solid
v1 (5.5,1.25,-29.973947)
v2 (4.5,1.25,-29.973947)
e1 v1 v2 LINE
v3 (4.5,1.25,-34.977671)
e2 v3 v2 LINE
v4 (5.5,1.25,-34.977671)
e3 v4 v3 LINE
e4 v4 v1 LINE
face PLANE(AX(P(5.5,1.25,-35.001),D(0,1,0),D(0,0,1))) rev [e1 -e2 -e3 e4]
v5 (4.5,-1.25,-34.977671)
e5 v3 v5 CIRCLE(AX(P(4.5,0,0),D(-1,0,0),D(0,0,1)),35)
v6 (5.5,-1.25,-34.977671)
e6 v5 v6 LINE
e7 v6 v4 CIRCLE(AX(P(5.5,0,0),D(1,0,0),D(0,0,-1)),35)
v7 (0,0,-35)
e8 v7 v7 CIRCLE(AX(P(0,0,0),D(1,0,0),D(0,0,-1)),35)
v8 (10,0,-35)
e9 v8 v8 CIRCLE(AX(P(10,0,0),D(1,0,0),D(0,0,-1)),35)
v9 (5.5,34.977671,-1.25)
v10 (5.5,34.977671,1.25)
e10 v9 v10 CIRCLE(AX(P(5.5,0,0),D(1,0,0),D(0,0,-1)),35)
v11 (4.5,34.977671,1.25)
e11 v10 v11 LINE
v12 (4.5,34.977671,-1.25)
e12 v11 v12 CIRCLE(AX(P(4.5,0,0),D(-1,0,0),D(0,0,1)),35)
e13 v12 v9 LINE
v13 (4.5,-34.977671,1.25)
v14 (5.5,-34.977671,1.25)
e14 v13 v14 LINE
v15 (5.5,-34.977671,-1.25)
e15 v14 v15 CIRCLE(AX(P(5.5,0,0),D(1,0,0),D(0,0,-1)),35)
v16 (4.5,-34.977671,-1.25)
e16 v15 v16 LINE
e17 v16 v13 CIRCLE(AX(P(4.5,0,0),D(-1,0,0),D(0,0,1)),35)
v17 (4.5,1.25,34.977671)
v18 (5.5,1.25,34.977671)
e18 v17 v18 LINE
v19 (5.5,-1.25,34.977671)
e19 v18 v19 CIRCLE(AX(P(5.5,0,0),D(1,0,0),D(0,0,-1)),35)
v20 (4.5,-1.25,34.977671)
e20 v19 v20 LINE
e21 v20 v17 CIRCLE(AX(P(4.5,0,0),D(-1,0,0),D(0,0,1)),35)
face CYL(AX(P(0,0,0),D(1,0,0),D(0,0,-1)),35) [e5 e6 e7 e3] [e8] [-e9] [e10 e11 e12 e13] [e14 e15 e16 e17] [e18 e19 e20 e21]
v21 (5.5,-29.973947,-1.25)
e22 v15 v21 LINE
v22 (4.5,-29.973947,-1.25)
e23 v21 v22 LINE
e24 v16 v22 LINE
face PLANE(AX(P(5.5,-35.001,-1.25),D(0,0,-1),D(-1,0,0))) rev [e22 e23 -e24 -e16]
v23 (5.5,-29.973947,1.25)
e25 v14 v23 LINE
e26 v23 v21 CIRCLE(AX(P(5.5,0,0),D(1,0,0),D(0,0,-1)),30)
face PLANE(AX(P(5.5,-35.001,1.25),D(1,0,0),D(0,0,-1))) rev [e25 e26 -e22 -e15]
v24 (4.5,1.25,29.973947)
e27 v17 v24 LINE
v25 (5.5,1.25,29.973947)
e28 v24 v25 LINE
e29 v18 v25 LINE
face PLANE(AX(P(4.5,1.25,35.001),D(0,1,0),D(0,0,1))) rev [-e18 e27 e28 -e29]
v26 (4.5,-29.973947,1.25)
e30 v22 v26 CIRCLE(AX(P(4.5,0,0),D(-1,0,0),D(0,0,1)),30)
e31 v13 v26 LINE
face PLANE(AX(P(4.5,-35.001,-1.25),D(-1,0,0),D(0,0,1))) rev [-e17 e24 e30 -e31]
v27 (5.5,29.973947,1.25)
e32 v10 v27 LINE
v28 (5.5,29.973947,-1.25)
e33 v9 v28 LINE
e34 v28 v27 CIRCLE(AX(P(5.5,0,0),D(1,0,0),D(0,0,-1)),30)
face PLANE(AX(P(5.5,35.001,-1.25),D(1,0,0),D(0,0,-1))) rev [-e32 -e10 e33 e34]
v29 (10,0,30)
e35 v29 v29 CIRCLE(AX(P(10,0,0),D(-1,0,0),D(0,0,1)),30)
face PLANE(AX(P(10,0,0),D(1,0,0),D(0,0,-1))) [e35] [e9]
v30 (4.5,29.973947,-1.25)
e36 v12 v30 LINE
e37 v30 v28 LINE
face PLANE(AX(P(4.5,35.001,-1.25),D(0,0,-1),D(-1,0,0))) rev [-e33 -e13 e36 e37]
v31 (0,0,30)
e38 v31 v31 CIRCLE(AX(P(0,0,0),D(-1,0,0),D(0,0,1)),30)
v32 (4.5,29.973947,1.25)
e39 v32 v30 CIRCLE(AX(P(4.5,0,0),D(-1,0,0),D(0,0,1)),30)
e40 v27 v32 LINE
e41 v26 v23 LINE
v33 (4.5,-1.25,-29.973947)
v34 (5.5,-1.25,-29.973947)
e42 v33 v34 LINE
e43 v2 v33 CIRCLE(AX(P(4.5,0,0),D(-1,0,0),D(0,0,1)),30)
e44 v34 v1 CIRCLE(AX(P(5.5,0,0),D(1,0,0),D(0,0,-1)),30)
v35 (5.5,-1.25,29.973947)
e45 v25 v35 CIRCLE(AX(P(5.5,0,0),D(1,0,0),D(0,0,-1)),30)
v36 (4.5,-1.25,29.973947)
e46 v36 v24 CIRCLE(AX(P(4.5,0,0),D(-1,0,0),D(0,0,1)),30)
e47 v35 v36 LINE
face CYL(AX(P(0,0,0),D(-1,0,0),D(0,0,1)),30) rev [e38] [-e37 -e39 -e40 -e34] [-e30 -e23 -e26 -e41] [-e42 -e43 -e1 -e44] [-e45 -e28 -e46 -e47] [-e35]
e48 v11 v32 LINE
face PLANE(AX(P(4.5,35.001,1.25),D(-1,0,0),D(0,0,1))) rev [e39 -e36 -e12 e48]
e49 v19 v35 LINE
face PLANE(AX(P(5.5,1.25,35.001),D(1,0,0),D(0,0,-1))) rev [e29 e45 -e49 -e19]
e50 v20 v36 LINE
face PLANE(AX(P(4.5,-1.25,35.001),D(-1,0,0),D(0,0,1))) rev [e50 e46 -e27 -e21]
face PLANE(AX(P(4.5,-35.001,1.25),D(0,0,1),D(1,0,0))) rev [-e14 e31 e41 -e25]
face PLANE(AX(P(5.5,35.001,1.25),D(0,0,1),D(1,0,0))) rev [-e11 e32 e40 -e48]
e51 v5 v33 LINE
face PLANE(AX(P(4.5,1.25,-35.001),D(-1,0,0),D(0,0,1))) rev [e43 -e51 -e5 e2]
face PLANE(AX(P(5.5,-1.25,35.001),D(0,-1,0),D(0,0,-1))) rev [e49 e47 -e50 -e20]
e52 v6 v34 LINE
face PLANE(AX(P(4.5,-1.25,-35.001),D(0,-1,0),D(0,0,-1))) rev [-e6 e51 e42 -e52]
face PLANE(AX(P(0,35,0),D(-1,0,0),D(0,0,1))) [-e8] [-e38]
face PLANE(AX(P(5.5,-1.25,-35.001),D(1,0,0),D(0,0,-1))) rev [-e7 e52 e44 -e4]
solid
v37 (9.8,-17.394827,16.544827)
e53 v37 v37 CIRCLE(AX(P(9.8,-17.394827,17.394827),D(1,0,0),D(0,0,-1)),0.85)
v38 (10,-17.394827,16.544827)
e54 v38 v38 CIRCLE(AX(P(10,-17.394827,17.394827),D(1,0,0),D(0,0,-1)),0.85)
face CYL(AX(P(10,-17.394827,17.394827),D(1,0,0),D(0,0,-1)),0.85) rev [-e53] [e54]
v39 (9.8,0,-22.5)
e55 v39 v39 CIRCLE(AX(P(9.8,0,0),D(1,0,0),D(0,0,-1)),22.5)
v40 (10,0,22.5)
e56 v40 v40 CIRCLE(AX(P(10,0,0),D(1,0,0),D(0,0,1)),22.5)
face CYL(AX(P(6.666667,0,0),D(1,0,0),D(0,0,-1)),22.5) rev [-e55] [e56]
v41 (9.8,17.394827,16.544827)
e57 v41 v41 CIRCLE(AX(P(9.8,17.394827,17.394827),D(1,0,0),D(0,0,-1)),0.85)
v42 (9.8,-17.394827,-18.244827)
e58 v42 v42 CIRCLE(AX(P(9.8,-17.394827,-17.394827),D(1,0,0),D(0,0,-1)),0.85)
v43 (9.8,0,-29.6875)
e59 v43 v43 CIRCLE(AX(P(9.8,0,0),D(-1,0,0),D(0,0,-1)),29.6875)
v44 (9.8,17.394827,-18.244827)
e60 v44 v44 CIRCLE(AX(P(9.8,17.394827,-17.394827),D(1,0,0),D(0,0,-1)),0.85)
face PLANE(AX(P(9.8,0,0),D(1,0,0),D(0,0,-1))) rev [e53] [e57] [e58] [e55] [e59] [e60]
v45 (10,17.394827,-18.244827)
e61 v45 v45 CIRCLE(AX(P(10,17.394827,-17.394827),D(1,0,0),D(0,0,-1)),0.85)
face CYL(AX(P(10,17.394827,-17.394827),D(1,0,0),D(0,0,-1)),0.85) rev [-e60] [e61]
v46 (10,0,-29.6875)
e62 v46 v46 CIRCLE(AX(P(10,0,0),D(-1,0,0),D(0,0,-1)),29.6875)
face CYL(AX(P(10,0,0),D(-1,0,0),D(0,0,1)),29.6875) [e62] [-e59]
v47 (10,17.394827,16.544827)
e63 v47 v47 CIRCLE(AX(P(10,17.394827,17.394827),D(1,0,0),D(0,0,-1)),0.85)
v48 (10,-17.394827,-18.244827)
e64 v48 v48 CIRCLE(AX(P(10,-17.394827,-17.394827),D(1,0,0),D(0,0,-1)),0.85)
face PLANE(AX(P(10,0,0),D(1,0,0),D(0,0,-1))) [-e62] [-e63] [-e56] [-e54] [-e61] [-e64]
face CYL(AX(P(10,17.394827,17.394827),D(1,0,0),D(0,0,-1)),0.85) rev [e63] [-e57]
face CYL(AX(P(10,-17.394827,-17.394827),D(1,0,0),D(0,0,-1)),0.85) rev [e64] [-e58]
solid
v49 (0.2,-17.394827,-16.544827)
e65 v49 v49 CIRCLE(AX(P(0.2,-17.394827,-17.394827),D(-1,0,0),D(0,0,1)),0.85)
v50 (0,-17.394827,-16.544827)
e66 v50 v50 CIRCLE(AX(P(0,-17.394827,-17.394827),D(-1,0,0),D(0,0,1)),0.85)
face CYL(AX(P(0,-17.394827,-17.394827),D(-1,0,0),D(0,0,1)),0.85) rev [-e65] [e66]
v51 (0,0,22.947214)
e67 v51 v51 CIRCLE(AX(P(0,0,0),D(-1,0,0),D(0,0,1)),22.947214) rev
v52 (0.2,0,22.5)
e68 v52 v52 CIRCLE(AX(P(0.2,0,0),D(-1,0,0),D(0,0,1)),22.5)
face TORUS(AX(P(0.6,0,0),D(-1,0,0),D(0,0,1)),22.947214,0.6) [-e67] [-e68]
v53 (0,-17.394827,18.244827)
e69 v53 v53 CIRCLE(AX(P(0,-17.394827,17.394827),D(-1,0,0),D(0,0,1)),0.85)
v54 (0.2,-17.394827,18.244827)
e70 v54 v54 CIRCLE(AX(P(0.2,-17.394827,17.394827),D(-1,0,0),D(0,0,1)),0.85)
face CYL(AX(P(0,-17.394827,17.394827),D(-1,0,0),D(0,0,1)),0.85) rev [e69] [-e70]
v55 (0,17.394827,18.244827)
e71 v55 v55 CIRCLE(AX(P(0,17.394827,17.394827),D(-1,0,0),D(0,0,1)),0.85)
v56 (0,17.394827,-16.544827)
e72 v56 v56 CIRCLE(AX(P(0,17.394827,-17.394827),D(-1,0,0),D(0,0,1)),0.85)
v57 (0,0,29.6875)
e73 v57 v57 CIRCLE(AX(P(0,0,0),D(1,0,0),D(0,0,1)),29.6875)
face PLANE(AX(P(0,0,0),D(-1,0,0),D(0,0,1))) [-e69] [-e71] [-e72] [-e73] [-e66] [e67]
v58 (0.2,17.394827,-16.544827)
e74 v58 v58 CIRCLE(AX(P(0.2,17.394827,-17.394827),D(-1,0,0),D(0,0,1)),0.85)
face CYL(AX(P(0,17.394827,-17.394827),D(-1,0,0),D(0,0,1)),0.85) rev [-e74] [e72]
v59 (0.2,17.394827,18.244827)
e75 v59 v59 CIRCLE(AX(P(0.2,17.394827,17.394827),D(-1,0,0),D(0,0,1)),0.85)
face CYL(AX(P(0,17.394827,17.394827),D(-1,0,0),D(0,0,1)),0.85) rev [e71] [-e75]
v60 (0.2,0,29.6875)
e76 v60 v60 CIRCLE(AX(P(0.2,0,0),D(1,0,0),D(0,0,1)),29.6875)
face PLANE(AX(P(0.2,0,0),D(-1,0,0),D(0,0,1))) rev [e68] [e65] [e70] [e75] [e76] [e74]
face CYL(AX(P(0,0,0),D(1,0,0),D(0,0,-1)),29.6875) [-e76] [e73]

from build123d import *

# Parameters (mm, degrees)
SKETCH_1_W                       = 10
SKETCH_1_H                       = 35
HOLE_WIZARD_M52_1_D              = 60
SKETCH_4_R                       = 29.6875
EXTRUDE_1_DEPTH                  = 0.2
SKETCH_6_R                       = 29.6875
EXTRUDE_2_DEPTH                  = 0.2
SKETCH_7_R                       = 22.5
CUT_EXTRUDE_1_DEPTH              = 3.333333333
SKETCH_10_R                      = 22.5
CUT_EXTRUDE_4_DEPTH              = 3.333333333
CUT_EXTRUDE_5_REACH              = 73.609
CUT_EXTRUDE_5_END_RADIUS         = 35
SKETCH_11_W                      = 1
SKETCH_11_H                      = 2.5
CUT_EXTRUDE_6_REACH              = 73.609
CUT_EXTRUDE_6_END_RADIUS         = 35
SKETCH_12_W                      = 1
SKETCH_12_H                      = 2.5
CUT_EXTRUDE_7_REACH              = 73.609
CUT_EXTRUDE_7_END_RADIUS         = 35
SKETCH_13_W                      = 1
SKETCH_13_H                      = 2.5
CUT_EXTRUDE_8_REACH              = 73.609
CUT_EXTRUDE_8_END_RADIUS         = 35
SKETCH_14_W                      = 1
SKETCH_14_H                      = 2.5
SKETCH_15_W                      = 0.85
SKETCH_15_H                      = 0.85
HOLE_WIZARD_1_7_1_7_1_AT_2_COUNT = 2
HOLE_WIZARD_1_7_1_7_1_AT_2_PITCH = 34.789653634
HOLE_WIZARD_1_7_1_7_1_AT_3_COUNT = 2
HOLE_WIZARD_1_7_1_7_1_AT_3_PITCH = 49.2
HOLE_WIZARD_1_7_1_7_1_AT_4_COUNT = 2
HOLE_WIZARD_1_7_1_7_1_AT_4_PITCH = 34.789653634
SKETCH_17_W                      = 0.85
SKETCH_17_H                      = 0.85
HOLE_WIZARD_1_7_1_7_2_AT_2_COUNT = 2
HOLE_WIZARD_1_7_1_7_2_AT_2_PITCH = 34.789653634
HOLE_WIZARD_1_7_1_7_2_AT_3_COUNT = 2
HOLE_WIZARD_1_7_1_7_2_AT_3_PITCH = 49.2
HOLE_WIZARD_1_7_1_7_2_AT_4_COUNT = 2
HOLE_WIZARD_1_7_1_7_2_AT_4_PITCH = 34.789653634
FILLET_2_R                       = 0.6


with BuildPart() as part:
    # 草图1 → 旋转1 (revolve)
    with BuildSketch(Plane.XY, mode=Mode.PRIVATE) as revolve_1_sk:
        with Locations((5, 17.5)):
            Rectangle(SKETCH_1_W, SKETCH_1_H)
    revolve(revolve_1_sk.sketch.rotate(Axis((0, 0, 0), (1, 0, 0)), 270), axis=Axis((0, 0, 0), (1, 0, 0)))

    # M52 间隙孔1 (through all)
    with Locations(Plane.ZY):
        with Locations((0, 0)):
            Hole(HOLE_WIZARD_M52_1_D / 2)

    # 切除-拉伸5: up to this cylinder (the profile starts inside it)
    cut_extrude_5_end = Plane(origin=(5, 0, 0), z_dir=(1, 0, 0)) * Cylinder(CUT_EXTRUDE_5_END_RADIUS, 218.218, mode=Mode.PRIVATE)
    # 草图11 → 切除-拉伸5 (cut, up to the surface)
    with BuildSketch(Plane.XY.offset(26.666666667), mode=Mode.PRIVATE) as cut_extrude_5_sk1:
        with Locations((5, 0)):
            Rectangle(SKETCH_11_W, SKETCH_11_H)
    cut_extrude_5_tool1 = extrude(cut_extrude_5_sk1.sketch, amount=-CUT_EXTRUDE_5_REACH, mode=Mode.PRIVATE) & cut_extrude_5_end
    add(cut_extrude_5_tool1.solids().sort_by_distance((5, 0, 26.666667))[0], mode=Mode.SUBTRACT)

    # 切除-拉伸6: up to this cylinder (the profile starts inside it)
    cut_extrude_6_end = Plane(origin=(5, 0, 0), z_dir=(1, 0, 0)) * Cylinder(CUT_EXTRUDE_6_END_RADIUS, 218.218, mode=Mode.PRIVATE)
    # 草图12 → 切除-拉伸6 (cut, up to the surface)
    with BuildSketch(Plane(origin=(0, 0, -26.666666667), x_dir=(-1, 0, 0), z_dir=(0, 0, -1)), mode=Mode.PRIVATE) as cut_extrude_6_sk1:
        with Locations((-5, 0)):
            Rectangle(SKETCH_12_W, SKETCH_12_H)
    cut_extrude_6_tool1 = extrude(cut_extrude_6_sk1.sketch, amount=-CUT_EXTRUDE_6_REACH, mode=Mode.PRIVATE) & cut_extrude_6_end
    add(cut_extrude_6_tool1.solids().sort_by_distance((5, 0, -26.666667))[0], mode=Mode.SUBTRACT)

    # 切除-拉伸7: up to this cylinder (the profile starts inside it)
    cut_extrude_7_end = Plane(origin=(5, 0, 0), z_dir=(1, 0, 0)) * Cylinder(CUT_EXTRUDE_7_END_RADIUS, 218.218, mode=Mode.PRIVATE)
    # 草图13 → 切除-拉伸7 (cut, up to the surface)
    with BuildSketch(Plane.XZ.offset(26.666666667), mode=Mode.PRIVATE) as cut_extrude_7_sk1:
        with Locations((5, 0)):
            Rectangle(SKETCH_13_W, SKETCH_13_H)
    cut_extrude_7_tool1 = extrude(cut_extrude_7_sk1.sketch, amount=-CUT_EXTRUDE_7_REACH, mode=Mode.PRIVATE) & cut_extrude_7_end
    add(cut_extrude_7_tool1.solids().sort_by_distance((5, -26.666667, 0))[0], mode=Mode.SUBTRACT)

    # 切除-拉伸8: up to this cylinder (the profile starts inside it)
    cut_extrude_8_end = Plane(origin=(5, 0, 0), z_dir=(1, 0, 0)) * Cylinder(CUT_EXTRUDE_8_END_RADIUS, 218.218, mode=Mode.PRIVATE)
    # 草图14 → 切除-拉伸8 (cut, up to the surface)
    with BuildSketch(Plane(origin=(0, 26.666666667, 0), x_dir=(1, 0, 0), z_dir=(0, 1, 0)), mode=Mode.PRIVATE) as cut_extrude_8_sk1:
        with Locations((5, 0)):
            Rectangle(SKETCH_14_W, SKETCH_14_H)
    cut_extrude_8_tool1 = extrude(cut_extrude_8_sk1.sketch, amount=-CUT_EXTRUDE_8_REACH, mode=Mode.PRIVATE) & cut_extrude_8_end
    add(cut_extrude_8_tool1.solids().sort_by_distance((5, 26.666667, 0))[0], mode=Mode.SUBTRACT)


with BuildPart() as body_2:
    # 草图4 → 凸台-拉伸1 (new body)
    with BuildSketch(Plane(origin=(0.2, 0, 0), x_dir=(0, 0, -1), z_dir=(1, 0, 0))):
        with Locations(Location((0, 0, 0), (0, 0, 180))):
            Circle(SKETCH_4_R)
    extrude(amount=-EXTRUDE_1_DEPTH)

    # 草图7 → 切除-拉伸1 (cut)
    with BuildSketch(Plane.ZY):
        Circle(SKETCH_7_R)
    extrude(amount=-CUT_EXTRUDE_1_DEPTH, mode=Mode.SUBTRACT)

    # 草图17 → Ø1.7 (1.7) 直径孔2 (revolve, cut)
    with BuildSketch(Plane(origin=(0, 17.394826817, 17.394826817), x_dir=(0, 0, 1), z_dir=(0, 1, 0))):
        with Locations((0.425, 0.425)):
            Rectangle(SKETCH_17_W, SKETCH_17_H)
    hole_wizard_1_7_1_7_2 = revolve(axis=Axis((-6.35, 17.394826817, 17.394826817), (1, 0, 0)), mode=Mode.SUBTRACT)

    # Ø1.7 (1.7) 直径孔2 at 2: Ø1.7 (1.7) 直径孔2 ×2
    with Locations(*[(0, -i * HOLE_WIZARD_1_7_1_7_2_AT_2_PITCH, 0) for i in range(1, HOLE_WIZARD_1_7_1_7_2_AT_2_COUNT)]):
        add(hole_wizard_1_7_1_7_2, mode=Mode.SUBTRACT)

    # Ø1.7 (1.7) 直径孔2 at 3: Ø1.7 (1.7) 直径孔2 ×2
    with Locations(*[Vector(0, -0.7071067811865476, -0.7071067811865475) * (i * HOLE_WIZARD_1_7_1_7_2_AT_3_PITCH) for i in range(1, HOLE_WIZARD_1_7_1_7_2_AT_3_COUNT)]):
        add(hole_wizard_1_7_1_7_2, mode=Mode.SUBTRACT)

    # Ø1.7 (1.7) 直径孔2 at 4: Ø1.7 (1.7) 直径孔2 ×2
    with Locations(*[(0, 0, -i * HOLE_WIZARD_1_7_1_7_2_AT_4_PITCH) for i in range(1, HOLE_WIZARD_1_7_1_7_2_AT_4_COUNT)]):
        add(hole_wizard_1_7_1_7_2, mode=Mode.SUBTRACT)

    # 圆角2
    # the kernel refuses this fillet: 0.6 mm, written as the material it takes off along each edge
    with BuildSketch(Plane(origin=(0, 0, 0), x_dir=(0, 0, 1), z_dir=(0, -1, 0))) as fillet_2_piece_1:
        with BuildLine():
            CenterArc((22.947213595, -0.6), FILLET_2_R, 90, 48.189685104)
            Line((22.5, -0.2), (22.491055728, -0.192))
            ThreePointArc((22.491055728, -0.192), (22.488, -0.1), (22.488, 0))
            Line((22.488, 0), (22.5, 0.012))
            Line((22.5, 0.012), (22.947213595, 0.012))
            Line((22.947213595, 0.012), (22.947213595, 0))
        make_face()
    revolve(axis=Axis((0, 0, 0), (-1, 0, 0)), mode=Mode.SUBTRACT)


with BuildPart() as body_3:
    # 草图6 → 凸台-拉伸2 (new body)
    with BuildSketch(Plane(origin=(9.8, 0, 0), x_dir=(0, -1, 0), z_dir=(-1, 0, 0))):
        with Locations(Location((0, 0, 0), (0, 0, 270))):
            Circle(SKETCH_6_R)
    extrude(amount=-EXTRUDE_2_DEPTH)

    # 草图10 → 切除-拉伸4 (cut)
    with BuildSketch(Plane(origin=(10, 0, 0), x_dir=(0, 0, -1), z_dir=(1, 0, 0))):
        Circle(SKETCH_10_R)
    extrude(amount=-CUT_EXTRUDE_4_DEPTH, mode=Mode.SUBTRACT)

    # 草图15 → Ø1.7 (1.7) 直径孔1 (revolve, cut)
    with BuildSketch(Plane(origin=(10, 17.394826817, 17.394826817), x_dir=(0, 0, -1), z_dir=(0, 1, 0))):
        with Locations((0.425, 0.425)):
            Rectangle(SKETCH_15_W, SKETCH_15_H)
    hole_wizard_1_7_1_7_1 = revolve(axis=Axis((16.35, 17.394826817, 17.394826817), (-1, 0, 0)), mode=Mode.SUBTRACT)

    # Ø1.7 (1.7) 直径孔1 at 2: Ø1.7 (1.7) 直径孔1 ×2
    with Locations(*[(0, -i * HOLE_WIZARD_1_7_1_7_1_AT_2_PITCH, 0) for i in range(1, HOLE_WIZARD_1_7_1_7_1_AT_2_COUNT)]):
        add(hole_wizard_1_7_1_7_1, mode=Mode.SUBTRACT)

    # Ø1.7 (1.7) 直径孔1 at 3: Ø1.7 (1.7) 直径孔1 ×2
    with Locations(*[Vector(0, -0.7071067811865476, -0.7071067811865475) * (i * HOLE_WIZARD_1_7_1_7_1_AT_3_PITCH) for i in range(1, HOLE_WIZARD_1_7_1_7_1_AT_3_COUNT)]):
        add(hole_wizard_1_7_1_7_1, mode=Mode.SUBTRACT)

    # Ø1.7 (1.7) 直径孔1 at 4: Ø1.7 (1.7) 直径孔1 ×2
    with Locations(*[(0, 0, -i * HOLE_WIZARD_1_7_1_7_1_AT_4_PITCH) for i in range(1, HOLE_WIZARD_1_7_1_7_1_AT_4_COUNT)]):
        add(hole_wizard_1_7_1_7_1, mode=Mode.SUBTRACT)


solid = Compound([part.part, body_2.part, body_3.part])
